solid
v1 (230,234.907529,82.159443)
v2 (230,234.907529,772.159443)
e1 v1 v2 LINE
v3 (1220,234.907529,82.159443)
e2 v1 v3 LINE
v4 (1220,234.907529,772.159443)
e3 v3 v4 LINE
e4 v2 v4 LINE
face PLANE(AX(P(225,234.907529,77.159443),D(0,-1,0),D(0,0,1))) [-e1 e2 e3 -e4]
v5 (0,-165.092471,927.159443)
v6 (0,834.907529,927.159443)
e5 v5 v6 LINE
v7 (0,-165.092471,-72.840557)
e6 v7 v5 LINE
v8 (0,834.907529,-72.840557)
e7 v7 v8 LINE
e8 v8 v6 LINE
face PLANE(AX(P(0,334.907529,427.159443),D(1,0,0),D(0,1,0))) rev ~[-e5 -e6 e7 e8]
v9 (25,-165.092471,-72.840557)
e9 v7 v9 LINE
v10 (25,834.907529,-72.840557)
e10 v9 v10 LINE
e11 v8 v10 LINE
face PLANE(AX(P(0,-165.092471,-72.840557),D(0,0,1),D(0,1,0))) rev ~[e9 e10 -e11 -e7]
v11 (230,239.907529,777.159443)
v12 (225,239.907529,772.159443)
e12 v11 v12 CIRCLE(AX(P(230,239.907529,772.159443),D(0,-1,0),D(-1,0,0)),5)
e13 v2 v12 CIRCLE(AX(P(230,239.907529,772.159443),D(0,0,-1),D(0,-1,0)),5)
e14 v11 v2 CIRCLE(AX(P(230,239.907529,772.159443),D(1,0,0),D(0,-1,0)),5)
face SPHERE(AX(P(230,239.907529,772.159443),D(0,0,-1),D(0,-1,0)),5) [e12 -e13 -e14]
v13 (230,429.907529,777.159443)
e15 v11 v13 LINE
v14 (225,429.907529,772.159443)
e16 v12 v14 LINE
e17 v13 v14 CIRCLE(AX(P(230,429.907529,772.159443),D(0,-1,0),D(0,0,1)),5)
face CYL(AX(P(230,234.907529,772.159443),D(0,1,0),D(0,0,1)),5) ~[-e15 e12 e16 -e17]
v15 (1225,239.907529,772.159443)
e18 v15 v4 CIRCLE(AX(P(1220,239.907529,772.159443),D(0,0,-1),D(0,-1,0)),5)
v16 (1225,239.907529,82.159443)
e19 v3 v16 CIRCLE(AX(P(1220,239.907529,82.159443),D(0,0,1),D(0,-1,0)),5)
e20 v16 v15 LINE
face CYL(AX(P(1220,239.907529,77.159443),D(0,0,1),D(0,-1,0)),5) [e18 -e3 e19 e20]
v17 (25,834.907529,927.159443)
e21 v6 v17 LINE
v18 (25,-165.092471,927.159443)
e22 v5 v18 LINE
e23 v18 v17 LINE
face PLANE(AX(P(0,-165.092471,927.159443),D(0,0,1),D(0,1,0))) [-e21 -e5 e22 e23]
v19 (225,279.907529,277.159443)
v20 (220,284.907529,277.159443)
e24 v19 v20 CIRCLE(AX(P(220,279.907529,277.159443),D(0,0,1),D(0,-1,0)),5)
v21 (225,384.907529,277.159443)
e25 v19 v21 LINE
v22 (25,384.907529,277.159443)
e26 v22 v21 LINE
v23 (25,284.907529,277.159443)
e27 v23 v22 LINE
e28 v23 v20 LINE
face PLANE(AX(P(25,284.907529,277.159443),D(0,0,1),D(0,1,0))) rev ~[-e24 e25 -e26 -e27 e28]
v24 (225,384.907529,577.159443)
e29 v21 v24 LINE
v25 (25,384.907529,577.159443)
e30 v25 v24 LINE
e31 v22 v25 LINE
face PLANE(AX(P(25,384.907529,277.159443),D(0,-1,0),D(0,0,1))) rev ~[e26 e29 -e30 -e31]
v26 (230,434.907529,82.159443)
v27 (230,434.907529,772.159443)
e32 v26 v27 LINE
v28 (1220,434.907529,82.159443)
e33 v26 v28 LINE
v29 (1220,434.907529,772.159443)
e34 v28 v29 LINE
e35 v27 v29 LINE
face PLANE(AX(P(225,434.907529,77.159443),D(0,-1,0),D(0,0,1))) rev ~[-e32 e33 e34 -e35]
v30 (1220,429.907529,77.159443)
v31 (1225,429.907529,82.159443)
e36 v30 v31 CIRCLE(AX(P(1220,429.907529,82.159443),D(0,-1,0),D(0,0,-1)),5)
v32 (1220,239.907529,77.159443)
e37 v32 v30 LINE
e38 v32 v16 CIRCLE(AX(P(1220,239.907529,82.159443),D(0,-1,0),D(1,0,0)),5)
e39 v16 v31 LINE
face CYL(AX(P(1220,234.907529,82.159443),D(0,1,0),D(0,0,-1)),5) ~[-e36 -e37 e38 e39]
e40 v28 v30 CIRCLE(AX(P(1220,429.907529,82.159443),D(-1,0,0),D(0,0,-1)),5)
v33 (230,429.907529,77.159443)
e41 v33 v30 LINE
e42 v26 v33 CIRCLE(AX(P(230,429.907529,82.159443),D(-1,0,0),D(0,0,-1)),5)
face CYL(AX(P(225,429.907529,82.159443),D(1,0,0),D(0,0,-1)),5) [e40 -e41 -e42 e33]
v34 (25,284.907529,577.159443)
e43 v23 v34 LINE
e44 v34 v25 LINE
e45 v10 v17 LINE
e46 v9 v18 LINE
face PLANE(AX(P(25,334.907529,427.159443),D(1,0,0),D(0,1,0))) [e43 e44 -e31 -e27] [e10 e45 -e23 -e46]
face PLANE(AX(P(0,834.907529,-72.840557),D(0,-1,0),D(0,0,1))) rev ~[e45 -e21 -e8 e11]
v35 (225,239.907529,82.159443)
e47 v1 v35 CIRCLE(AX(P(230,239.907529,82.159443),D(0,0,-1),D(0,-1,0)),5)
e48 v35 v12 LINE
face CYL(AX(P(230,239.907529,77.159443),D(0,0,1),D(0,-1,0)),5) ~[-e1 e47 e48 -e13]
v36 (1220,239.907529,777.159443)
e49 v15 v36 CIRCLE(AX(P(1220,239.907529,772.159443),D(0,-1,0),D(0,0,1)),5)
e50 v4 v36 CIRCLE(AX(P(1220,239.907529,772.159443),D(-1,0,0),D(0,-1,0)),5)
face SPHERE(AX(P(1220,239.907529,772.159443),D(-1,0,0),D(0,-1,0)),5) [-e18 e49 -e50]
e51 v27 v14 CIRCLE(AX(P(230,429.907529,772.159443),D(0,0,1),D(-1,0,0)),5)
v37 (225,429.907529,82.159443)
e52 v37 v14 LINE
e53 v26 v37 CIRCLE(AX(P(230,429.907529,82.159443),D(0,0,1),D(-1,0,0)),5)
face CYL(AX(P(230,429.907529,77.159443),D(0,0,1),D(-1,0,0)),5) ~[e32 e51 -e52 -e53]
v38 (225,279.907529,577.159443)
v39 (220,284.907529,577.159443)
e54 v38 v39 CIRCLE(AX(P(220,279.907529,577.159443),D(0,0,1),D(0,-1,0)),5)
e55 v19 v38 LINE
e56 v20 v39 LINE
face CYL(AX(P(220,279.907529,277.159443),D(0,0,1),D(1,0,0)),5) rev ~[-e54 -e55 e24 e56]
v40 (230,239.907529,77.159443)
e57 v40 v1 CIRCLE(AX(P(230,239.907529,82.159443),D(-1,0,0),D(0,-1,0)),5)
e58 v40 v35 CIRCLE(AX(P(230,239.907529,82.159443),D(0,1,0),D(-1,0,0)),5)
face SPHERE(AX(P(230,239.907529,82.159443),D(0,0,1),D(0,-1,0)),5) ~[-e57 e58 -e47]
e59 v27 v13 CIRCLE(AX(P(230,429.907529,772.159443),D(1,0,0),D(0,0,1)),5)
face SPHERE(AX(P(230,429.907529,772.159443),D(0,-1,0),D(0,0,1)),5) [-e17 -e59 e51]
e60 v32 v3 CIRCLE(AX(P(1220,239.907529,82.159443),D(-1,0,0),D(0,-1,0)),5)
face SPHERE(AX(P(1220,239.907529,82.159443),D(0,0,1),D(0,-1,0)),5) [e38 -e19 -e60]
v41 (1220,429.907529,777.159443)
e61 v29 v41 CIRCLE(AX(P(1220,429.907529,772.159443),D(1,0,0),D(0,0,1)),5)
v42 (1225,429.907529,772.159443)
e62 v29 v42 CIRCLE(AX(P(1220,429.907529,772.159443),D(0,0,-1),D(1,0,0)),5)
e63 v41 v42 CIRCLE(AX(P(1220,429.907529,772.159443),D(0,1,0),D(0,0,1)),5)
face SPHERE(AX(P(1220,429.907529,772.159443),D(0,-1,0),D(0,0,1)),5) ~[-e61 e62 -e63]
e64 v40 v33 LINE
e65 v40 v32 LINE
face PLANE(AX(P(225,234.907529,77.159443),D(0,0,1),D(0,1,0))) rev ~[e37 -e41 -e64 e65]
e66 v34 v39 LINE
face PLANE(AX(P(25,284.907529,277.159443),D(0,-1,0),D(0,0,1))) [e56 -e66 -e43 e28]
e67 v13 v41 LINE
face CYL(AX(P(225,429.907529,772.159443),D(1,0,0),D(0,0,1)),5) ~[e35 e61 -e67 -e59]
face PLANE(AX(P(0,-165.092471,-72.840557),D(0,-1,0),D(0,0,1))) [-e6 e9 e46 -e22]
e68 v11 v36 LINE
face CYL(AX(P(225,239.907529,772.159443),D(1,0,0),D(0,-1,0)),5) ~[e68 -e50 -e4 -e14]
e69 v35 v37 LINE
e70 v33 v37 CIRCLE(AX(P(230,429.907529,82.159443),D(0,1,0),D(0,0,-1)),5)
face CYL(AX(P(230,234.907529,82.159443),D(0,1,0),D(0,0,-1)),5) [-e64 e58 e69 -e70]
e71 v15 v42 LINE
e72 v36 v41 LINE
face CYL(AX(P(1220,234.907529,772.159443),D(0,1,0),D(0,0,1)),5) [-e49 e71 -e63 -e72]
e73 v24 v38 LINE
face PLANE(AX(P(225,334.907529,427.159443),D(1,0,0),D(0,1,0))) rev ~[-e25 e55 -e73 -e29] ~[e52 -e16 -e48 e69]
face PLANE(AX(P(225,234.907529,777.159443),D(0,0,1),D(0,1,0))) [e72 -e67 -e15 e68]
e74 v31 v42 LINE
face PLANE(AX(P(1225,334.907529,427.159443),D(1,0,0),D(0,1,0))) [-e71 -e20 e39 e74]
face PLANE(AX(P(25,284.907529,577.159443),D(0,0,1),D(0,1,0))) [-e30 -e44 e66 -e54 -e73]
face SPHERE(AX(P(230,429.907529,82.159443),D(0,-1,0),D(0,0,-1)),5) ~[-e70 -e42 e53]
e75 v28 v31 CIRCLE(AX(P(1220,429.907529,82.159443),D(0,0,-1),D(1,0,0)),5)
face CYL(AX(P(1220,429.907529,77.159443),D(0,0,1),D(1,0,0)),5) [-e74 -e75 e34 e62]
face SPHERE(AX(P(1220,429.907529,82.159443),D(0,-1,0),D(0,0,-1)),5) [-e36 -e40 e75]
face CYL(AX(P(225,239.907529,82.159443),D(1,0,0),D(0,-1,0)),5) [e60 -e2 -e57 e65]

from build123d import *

# Parameters (mm, degrees)
F0_W     = 1000
F0_H     = 1000
F1_DEPTH = 25
F2_W     = 100
F2_H     = 300
F3_DEPTH = 200
F4_W     = 200
F4_H     = 700
F4_W_2   = 100
F4_H_2   = 300
F5_DEPTH = 1000
F6_R     = 5


# Not quite as in the source:
# - two fillets or chamfers of one size are made in one step


with BuildPart() as f1:
    # F0 (on Right) → F1 (new body)
    with BuildSketch(Plane.YZ):
        with Locations((334.907528758, 427.1594434977)):
            Rectangle(F0_W, F0_H)
    extrude(amount=F1_DEPTH)

    # F2 (on face) → F3 (join)
    with BuildSketch(Plane.YZ.offset(25)):
        with Locations((334.907528758, 427.1594434977)):
            Rectangle(F2_W, F2_H)
    extrude(amount=F3_DEPTH)

    # F4 (on face) → F5 (join)
    with BuildSketch(Plane.YZ.offset(225)):
        with Locations((334.907528758, 427.1594434977)):
            Rectangle(F4_W, F4_H)
        with Locations((334.907528758, 427.1594434977)):
            Rectangle(F4_W_2, F4_H_2, mode=Mode.SUBTRACT)
        with Locations((334.907528758, 427.1594434977)):
            Rectangle(F4_W_2, F4_H_2)
    extrude(amount=F5_DEPTH)

    # F6
    f6_edges = [f1.edges().sort_by_distance(p)[0] for p in [
        (225, 234.907529, 427.159443),
        (225, 284.907529, 427.159443),
        (725, 234.907529, 777.159443),
        (1225, 234.907529, 427.159443),
        (1225, 334.907529, 777.159443),
        (725, 234.907529, 77.159443),
        (225, 334.907529, 77.159443),
        (1225, 334.907529, 77.159443),
        (225, 334.907529, 777.159443),
        (725, 434.907529, 77.159443),
        (725, 434.907529, 777.159443),
        (225, 434.907529, 427.159443),
        (1225, 434.907529, 427.159443),
    ]]
    fillet(f6_edges, radius=F6_R)


solid = f1.part
